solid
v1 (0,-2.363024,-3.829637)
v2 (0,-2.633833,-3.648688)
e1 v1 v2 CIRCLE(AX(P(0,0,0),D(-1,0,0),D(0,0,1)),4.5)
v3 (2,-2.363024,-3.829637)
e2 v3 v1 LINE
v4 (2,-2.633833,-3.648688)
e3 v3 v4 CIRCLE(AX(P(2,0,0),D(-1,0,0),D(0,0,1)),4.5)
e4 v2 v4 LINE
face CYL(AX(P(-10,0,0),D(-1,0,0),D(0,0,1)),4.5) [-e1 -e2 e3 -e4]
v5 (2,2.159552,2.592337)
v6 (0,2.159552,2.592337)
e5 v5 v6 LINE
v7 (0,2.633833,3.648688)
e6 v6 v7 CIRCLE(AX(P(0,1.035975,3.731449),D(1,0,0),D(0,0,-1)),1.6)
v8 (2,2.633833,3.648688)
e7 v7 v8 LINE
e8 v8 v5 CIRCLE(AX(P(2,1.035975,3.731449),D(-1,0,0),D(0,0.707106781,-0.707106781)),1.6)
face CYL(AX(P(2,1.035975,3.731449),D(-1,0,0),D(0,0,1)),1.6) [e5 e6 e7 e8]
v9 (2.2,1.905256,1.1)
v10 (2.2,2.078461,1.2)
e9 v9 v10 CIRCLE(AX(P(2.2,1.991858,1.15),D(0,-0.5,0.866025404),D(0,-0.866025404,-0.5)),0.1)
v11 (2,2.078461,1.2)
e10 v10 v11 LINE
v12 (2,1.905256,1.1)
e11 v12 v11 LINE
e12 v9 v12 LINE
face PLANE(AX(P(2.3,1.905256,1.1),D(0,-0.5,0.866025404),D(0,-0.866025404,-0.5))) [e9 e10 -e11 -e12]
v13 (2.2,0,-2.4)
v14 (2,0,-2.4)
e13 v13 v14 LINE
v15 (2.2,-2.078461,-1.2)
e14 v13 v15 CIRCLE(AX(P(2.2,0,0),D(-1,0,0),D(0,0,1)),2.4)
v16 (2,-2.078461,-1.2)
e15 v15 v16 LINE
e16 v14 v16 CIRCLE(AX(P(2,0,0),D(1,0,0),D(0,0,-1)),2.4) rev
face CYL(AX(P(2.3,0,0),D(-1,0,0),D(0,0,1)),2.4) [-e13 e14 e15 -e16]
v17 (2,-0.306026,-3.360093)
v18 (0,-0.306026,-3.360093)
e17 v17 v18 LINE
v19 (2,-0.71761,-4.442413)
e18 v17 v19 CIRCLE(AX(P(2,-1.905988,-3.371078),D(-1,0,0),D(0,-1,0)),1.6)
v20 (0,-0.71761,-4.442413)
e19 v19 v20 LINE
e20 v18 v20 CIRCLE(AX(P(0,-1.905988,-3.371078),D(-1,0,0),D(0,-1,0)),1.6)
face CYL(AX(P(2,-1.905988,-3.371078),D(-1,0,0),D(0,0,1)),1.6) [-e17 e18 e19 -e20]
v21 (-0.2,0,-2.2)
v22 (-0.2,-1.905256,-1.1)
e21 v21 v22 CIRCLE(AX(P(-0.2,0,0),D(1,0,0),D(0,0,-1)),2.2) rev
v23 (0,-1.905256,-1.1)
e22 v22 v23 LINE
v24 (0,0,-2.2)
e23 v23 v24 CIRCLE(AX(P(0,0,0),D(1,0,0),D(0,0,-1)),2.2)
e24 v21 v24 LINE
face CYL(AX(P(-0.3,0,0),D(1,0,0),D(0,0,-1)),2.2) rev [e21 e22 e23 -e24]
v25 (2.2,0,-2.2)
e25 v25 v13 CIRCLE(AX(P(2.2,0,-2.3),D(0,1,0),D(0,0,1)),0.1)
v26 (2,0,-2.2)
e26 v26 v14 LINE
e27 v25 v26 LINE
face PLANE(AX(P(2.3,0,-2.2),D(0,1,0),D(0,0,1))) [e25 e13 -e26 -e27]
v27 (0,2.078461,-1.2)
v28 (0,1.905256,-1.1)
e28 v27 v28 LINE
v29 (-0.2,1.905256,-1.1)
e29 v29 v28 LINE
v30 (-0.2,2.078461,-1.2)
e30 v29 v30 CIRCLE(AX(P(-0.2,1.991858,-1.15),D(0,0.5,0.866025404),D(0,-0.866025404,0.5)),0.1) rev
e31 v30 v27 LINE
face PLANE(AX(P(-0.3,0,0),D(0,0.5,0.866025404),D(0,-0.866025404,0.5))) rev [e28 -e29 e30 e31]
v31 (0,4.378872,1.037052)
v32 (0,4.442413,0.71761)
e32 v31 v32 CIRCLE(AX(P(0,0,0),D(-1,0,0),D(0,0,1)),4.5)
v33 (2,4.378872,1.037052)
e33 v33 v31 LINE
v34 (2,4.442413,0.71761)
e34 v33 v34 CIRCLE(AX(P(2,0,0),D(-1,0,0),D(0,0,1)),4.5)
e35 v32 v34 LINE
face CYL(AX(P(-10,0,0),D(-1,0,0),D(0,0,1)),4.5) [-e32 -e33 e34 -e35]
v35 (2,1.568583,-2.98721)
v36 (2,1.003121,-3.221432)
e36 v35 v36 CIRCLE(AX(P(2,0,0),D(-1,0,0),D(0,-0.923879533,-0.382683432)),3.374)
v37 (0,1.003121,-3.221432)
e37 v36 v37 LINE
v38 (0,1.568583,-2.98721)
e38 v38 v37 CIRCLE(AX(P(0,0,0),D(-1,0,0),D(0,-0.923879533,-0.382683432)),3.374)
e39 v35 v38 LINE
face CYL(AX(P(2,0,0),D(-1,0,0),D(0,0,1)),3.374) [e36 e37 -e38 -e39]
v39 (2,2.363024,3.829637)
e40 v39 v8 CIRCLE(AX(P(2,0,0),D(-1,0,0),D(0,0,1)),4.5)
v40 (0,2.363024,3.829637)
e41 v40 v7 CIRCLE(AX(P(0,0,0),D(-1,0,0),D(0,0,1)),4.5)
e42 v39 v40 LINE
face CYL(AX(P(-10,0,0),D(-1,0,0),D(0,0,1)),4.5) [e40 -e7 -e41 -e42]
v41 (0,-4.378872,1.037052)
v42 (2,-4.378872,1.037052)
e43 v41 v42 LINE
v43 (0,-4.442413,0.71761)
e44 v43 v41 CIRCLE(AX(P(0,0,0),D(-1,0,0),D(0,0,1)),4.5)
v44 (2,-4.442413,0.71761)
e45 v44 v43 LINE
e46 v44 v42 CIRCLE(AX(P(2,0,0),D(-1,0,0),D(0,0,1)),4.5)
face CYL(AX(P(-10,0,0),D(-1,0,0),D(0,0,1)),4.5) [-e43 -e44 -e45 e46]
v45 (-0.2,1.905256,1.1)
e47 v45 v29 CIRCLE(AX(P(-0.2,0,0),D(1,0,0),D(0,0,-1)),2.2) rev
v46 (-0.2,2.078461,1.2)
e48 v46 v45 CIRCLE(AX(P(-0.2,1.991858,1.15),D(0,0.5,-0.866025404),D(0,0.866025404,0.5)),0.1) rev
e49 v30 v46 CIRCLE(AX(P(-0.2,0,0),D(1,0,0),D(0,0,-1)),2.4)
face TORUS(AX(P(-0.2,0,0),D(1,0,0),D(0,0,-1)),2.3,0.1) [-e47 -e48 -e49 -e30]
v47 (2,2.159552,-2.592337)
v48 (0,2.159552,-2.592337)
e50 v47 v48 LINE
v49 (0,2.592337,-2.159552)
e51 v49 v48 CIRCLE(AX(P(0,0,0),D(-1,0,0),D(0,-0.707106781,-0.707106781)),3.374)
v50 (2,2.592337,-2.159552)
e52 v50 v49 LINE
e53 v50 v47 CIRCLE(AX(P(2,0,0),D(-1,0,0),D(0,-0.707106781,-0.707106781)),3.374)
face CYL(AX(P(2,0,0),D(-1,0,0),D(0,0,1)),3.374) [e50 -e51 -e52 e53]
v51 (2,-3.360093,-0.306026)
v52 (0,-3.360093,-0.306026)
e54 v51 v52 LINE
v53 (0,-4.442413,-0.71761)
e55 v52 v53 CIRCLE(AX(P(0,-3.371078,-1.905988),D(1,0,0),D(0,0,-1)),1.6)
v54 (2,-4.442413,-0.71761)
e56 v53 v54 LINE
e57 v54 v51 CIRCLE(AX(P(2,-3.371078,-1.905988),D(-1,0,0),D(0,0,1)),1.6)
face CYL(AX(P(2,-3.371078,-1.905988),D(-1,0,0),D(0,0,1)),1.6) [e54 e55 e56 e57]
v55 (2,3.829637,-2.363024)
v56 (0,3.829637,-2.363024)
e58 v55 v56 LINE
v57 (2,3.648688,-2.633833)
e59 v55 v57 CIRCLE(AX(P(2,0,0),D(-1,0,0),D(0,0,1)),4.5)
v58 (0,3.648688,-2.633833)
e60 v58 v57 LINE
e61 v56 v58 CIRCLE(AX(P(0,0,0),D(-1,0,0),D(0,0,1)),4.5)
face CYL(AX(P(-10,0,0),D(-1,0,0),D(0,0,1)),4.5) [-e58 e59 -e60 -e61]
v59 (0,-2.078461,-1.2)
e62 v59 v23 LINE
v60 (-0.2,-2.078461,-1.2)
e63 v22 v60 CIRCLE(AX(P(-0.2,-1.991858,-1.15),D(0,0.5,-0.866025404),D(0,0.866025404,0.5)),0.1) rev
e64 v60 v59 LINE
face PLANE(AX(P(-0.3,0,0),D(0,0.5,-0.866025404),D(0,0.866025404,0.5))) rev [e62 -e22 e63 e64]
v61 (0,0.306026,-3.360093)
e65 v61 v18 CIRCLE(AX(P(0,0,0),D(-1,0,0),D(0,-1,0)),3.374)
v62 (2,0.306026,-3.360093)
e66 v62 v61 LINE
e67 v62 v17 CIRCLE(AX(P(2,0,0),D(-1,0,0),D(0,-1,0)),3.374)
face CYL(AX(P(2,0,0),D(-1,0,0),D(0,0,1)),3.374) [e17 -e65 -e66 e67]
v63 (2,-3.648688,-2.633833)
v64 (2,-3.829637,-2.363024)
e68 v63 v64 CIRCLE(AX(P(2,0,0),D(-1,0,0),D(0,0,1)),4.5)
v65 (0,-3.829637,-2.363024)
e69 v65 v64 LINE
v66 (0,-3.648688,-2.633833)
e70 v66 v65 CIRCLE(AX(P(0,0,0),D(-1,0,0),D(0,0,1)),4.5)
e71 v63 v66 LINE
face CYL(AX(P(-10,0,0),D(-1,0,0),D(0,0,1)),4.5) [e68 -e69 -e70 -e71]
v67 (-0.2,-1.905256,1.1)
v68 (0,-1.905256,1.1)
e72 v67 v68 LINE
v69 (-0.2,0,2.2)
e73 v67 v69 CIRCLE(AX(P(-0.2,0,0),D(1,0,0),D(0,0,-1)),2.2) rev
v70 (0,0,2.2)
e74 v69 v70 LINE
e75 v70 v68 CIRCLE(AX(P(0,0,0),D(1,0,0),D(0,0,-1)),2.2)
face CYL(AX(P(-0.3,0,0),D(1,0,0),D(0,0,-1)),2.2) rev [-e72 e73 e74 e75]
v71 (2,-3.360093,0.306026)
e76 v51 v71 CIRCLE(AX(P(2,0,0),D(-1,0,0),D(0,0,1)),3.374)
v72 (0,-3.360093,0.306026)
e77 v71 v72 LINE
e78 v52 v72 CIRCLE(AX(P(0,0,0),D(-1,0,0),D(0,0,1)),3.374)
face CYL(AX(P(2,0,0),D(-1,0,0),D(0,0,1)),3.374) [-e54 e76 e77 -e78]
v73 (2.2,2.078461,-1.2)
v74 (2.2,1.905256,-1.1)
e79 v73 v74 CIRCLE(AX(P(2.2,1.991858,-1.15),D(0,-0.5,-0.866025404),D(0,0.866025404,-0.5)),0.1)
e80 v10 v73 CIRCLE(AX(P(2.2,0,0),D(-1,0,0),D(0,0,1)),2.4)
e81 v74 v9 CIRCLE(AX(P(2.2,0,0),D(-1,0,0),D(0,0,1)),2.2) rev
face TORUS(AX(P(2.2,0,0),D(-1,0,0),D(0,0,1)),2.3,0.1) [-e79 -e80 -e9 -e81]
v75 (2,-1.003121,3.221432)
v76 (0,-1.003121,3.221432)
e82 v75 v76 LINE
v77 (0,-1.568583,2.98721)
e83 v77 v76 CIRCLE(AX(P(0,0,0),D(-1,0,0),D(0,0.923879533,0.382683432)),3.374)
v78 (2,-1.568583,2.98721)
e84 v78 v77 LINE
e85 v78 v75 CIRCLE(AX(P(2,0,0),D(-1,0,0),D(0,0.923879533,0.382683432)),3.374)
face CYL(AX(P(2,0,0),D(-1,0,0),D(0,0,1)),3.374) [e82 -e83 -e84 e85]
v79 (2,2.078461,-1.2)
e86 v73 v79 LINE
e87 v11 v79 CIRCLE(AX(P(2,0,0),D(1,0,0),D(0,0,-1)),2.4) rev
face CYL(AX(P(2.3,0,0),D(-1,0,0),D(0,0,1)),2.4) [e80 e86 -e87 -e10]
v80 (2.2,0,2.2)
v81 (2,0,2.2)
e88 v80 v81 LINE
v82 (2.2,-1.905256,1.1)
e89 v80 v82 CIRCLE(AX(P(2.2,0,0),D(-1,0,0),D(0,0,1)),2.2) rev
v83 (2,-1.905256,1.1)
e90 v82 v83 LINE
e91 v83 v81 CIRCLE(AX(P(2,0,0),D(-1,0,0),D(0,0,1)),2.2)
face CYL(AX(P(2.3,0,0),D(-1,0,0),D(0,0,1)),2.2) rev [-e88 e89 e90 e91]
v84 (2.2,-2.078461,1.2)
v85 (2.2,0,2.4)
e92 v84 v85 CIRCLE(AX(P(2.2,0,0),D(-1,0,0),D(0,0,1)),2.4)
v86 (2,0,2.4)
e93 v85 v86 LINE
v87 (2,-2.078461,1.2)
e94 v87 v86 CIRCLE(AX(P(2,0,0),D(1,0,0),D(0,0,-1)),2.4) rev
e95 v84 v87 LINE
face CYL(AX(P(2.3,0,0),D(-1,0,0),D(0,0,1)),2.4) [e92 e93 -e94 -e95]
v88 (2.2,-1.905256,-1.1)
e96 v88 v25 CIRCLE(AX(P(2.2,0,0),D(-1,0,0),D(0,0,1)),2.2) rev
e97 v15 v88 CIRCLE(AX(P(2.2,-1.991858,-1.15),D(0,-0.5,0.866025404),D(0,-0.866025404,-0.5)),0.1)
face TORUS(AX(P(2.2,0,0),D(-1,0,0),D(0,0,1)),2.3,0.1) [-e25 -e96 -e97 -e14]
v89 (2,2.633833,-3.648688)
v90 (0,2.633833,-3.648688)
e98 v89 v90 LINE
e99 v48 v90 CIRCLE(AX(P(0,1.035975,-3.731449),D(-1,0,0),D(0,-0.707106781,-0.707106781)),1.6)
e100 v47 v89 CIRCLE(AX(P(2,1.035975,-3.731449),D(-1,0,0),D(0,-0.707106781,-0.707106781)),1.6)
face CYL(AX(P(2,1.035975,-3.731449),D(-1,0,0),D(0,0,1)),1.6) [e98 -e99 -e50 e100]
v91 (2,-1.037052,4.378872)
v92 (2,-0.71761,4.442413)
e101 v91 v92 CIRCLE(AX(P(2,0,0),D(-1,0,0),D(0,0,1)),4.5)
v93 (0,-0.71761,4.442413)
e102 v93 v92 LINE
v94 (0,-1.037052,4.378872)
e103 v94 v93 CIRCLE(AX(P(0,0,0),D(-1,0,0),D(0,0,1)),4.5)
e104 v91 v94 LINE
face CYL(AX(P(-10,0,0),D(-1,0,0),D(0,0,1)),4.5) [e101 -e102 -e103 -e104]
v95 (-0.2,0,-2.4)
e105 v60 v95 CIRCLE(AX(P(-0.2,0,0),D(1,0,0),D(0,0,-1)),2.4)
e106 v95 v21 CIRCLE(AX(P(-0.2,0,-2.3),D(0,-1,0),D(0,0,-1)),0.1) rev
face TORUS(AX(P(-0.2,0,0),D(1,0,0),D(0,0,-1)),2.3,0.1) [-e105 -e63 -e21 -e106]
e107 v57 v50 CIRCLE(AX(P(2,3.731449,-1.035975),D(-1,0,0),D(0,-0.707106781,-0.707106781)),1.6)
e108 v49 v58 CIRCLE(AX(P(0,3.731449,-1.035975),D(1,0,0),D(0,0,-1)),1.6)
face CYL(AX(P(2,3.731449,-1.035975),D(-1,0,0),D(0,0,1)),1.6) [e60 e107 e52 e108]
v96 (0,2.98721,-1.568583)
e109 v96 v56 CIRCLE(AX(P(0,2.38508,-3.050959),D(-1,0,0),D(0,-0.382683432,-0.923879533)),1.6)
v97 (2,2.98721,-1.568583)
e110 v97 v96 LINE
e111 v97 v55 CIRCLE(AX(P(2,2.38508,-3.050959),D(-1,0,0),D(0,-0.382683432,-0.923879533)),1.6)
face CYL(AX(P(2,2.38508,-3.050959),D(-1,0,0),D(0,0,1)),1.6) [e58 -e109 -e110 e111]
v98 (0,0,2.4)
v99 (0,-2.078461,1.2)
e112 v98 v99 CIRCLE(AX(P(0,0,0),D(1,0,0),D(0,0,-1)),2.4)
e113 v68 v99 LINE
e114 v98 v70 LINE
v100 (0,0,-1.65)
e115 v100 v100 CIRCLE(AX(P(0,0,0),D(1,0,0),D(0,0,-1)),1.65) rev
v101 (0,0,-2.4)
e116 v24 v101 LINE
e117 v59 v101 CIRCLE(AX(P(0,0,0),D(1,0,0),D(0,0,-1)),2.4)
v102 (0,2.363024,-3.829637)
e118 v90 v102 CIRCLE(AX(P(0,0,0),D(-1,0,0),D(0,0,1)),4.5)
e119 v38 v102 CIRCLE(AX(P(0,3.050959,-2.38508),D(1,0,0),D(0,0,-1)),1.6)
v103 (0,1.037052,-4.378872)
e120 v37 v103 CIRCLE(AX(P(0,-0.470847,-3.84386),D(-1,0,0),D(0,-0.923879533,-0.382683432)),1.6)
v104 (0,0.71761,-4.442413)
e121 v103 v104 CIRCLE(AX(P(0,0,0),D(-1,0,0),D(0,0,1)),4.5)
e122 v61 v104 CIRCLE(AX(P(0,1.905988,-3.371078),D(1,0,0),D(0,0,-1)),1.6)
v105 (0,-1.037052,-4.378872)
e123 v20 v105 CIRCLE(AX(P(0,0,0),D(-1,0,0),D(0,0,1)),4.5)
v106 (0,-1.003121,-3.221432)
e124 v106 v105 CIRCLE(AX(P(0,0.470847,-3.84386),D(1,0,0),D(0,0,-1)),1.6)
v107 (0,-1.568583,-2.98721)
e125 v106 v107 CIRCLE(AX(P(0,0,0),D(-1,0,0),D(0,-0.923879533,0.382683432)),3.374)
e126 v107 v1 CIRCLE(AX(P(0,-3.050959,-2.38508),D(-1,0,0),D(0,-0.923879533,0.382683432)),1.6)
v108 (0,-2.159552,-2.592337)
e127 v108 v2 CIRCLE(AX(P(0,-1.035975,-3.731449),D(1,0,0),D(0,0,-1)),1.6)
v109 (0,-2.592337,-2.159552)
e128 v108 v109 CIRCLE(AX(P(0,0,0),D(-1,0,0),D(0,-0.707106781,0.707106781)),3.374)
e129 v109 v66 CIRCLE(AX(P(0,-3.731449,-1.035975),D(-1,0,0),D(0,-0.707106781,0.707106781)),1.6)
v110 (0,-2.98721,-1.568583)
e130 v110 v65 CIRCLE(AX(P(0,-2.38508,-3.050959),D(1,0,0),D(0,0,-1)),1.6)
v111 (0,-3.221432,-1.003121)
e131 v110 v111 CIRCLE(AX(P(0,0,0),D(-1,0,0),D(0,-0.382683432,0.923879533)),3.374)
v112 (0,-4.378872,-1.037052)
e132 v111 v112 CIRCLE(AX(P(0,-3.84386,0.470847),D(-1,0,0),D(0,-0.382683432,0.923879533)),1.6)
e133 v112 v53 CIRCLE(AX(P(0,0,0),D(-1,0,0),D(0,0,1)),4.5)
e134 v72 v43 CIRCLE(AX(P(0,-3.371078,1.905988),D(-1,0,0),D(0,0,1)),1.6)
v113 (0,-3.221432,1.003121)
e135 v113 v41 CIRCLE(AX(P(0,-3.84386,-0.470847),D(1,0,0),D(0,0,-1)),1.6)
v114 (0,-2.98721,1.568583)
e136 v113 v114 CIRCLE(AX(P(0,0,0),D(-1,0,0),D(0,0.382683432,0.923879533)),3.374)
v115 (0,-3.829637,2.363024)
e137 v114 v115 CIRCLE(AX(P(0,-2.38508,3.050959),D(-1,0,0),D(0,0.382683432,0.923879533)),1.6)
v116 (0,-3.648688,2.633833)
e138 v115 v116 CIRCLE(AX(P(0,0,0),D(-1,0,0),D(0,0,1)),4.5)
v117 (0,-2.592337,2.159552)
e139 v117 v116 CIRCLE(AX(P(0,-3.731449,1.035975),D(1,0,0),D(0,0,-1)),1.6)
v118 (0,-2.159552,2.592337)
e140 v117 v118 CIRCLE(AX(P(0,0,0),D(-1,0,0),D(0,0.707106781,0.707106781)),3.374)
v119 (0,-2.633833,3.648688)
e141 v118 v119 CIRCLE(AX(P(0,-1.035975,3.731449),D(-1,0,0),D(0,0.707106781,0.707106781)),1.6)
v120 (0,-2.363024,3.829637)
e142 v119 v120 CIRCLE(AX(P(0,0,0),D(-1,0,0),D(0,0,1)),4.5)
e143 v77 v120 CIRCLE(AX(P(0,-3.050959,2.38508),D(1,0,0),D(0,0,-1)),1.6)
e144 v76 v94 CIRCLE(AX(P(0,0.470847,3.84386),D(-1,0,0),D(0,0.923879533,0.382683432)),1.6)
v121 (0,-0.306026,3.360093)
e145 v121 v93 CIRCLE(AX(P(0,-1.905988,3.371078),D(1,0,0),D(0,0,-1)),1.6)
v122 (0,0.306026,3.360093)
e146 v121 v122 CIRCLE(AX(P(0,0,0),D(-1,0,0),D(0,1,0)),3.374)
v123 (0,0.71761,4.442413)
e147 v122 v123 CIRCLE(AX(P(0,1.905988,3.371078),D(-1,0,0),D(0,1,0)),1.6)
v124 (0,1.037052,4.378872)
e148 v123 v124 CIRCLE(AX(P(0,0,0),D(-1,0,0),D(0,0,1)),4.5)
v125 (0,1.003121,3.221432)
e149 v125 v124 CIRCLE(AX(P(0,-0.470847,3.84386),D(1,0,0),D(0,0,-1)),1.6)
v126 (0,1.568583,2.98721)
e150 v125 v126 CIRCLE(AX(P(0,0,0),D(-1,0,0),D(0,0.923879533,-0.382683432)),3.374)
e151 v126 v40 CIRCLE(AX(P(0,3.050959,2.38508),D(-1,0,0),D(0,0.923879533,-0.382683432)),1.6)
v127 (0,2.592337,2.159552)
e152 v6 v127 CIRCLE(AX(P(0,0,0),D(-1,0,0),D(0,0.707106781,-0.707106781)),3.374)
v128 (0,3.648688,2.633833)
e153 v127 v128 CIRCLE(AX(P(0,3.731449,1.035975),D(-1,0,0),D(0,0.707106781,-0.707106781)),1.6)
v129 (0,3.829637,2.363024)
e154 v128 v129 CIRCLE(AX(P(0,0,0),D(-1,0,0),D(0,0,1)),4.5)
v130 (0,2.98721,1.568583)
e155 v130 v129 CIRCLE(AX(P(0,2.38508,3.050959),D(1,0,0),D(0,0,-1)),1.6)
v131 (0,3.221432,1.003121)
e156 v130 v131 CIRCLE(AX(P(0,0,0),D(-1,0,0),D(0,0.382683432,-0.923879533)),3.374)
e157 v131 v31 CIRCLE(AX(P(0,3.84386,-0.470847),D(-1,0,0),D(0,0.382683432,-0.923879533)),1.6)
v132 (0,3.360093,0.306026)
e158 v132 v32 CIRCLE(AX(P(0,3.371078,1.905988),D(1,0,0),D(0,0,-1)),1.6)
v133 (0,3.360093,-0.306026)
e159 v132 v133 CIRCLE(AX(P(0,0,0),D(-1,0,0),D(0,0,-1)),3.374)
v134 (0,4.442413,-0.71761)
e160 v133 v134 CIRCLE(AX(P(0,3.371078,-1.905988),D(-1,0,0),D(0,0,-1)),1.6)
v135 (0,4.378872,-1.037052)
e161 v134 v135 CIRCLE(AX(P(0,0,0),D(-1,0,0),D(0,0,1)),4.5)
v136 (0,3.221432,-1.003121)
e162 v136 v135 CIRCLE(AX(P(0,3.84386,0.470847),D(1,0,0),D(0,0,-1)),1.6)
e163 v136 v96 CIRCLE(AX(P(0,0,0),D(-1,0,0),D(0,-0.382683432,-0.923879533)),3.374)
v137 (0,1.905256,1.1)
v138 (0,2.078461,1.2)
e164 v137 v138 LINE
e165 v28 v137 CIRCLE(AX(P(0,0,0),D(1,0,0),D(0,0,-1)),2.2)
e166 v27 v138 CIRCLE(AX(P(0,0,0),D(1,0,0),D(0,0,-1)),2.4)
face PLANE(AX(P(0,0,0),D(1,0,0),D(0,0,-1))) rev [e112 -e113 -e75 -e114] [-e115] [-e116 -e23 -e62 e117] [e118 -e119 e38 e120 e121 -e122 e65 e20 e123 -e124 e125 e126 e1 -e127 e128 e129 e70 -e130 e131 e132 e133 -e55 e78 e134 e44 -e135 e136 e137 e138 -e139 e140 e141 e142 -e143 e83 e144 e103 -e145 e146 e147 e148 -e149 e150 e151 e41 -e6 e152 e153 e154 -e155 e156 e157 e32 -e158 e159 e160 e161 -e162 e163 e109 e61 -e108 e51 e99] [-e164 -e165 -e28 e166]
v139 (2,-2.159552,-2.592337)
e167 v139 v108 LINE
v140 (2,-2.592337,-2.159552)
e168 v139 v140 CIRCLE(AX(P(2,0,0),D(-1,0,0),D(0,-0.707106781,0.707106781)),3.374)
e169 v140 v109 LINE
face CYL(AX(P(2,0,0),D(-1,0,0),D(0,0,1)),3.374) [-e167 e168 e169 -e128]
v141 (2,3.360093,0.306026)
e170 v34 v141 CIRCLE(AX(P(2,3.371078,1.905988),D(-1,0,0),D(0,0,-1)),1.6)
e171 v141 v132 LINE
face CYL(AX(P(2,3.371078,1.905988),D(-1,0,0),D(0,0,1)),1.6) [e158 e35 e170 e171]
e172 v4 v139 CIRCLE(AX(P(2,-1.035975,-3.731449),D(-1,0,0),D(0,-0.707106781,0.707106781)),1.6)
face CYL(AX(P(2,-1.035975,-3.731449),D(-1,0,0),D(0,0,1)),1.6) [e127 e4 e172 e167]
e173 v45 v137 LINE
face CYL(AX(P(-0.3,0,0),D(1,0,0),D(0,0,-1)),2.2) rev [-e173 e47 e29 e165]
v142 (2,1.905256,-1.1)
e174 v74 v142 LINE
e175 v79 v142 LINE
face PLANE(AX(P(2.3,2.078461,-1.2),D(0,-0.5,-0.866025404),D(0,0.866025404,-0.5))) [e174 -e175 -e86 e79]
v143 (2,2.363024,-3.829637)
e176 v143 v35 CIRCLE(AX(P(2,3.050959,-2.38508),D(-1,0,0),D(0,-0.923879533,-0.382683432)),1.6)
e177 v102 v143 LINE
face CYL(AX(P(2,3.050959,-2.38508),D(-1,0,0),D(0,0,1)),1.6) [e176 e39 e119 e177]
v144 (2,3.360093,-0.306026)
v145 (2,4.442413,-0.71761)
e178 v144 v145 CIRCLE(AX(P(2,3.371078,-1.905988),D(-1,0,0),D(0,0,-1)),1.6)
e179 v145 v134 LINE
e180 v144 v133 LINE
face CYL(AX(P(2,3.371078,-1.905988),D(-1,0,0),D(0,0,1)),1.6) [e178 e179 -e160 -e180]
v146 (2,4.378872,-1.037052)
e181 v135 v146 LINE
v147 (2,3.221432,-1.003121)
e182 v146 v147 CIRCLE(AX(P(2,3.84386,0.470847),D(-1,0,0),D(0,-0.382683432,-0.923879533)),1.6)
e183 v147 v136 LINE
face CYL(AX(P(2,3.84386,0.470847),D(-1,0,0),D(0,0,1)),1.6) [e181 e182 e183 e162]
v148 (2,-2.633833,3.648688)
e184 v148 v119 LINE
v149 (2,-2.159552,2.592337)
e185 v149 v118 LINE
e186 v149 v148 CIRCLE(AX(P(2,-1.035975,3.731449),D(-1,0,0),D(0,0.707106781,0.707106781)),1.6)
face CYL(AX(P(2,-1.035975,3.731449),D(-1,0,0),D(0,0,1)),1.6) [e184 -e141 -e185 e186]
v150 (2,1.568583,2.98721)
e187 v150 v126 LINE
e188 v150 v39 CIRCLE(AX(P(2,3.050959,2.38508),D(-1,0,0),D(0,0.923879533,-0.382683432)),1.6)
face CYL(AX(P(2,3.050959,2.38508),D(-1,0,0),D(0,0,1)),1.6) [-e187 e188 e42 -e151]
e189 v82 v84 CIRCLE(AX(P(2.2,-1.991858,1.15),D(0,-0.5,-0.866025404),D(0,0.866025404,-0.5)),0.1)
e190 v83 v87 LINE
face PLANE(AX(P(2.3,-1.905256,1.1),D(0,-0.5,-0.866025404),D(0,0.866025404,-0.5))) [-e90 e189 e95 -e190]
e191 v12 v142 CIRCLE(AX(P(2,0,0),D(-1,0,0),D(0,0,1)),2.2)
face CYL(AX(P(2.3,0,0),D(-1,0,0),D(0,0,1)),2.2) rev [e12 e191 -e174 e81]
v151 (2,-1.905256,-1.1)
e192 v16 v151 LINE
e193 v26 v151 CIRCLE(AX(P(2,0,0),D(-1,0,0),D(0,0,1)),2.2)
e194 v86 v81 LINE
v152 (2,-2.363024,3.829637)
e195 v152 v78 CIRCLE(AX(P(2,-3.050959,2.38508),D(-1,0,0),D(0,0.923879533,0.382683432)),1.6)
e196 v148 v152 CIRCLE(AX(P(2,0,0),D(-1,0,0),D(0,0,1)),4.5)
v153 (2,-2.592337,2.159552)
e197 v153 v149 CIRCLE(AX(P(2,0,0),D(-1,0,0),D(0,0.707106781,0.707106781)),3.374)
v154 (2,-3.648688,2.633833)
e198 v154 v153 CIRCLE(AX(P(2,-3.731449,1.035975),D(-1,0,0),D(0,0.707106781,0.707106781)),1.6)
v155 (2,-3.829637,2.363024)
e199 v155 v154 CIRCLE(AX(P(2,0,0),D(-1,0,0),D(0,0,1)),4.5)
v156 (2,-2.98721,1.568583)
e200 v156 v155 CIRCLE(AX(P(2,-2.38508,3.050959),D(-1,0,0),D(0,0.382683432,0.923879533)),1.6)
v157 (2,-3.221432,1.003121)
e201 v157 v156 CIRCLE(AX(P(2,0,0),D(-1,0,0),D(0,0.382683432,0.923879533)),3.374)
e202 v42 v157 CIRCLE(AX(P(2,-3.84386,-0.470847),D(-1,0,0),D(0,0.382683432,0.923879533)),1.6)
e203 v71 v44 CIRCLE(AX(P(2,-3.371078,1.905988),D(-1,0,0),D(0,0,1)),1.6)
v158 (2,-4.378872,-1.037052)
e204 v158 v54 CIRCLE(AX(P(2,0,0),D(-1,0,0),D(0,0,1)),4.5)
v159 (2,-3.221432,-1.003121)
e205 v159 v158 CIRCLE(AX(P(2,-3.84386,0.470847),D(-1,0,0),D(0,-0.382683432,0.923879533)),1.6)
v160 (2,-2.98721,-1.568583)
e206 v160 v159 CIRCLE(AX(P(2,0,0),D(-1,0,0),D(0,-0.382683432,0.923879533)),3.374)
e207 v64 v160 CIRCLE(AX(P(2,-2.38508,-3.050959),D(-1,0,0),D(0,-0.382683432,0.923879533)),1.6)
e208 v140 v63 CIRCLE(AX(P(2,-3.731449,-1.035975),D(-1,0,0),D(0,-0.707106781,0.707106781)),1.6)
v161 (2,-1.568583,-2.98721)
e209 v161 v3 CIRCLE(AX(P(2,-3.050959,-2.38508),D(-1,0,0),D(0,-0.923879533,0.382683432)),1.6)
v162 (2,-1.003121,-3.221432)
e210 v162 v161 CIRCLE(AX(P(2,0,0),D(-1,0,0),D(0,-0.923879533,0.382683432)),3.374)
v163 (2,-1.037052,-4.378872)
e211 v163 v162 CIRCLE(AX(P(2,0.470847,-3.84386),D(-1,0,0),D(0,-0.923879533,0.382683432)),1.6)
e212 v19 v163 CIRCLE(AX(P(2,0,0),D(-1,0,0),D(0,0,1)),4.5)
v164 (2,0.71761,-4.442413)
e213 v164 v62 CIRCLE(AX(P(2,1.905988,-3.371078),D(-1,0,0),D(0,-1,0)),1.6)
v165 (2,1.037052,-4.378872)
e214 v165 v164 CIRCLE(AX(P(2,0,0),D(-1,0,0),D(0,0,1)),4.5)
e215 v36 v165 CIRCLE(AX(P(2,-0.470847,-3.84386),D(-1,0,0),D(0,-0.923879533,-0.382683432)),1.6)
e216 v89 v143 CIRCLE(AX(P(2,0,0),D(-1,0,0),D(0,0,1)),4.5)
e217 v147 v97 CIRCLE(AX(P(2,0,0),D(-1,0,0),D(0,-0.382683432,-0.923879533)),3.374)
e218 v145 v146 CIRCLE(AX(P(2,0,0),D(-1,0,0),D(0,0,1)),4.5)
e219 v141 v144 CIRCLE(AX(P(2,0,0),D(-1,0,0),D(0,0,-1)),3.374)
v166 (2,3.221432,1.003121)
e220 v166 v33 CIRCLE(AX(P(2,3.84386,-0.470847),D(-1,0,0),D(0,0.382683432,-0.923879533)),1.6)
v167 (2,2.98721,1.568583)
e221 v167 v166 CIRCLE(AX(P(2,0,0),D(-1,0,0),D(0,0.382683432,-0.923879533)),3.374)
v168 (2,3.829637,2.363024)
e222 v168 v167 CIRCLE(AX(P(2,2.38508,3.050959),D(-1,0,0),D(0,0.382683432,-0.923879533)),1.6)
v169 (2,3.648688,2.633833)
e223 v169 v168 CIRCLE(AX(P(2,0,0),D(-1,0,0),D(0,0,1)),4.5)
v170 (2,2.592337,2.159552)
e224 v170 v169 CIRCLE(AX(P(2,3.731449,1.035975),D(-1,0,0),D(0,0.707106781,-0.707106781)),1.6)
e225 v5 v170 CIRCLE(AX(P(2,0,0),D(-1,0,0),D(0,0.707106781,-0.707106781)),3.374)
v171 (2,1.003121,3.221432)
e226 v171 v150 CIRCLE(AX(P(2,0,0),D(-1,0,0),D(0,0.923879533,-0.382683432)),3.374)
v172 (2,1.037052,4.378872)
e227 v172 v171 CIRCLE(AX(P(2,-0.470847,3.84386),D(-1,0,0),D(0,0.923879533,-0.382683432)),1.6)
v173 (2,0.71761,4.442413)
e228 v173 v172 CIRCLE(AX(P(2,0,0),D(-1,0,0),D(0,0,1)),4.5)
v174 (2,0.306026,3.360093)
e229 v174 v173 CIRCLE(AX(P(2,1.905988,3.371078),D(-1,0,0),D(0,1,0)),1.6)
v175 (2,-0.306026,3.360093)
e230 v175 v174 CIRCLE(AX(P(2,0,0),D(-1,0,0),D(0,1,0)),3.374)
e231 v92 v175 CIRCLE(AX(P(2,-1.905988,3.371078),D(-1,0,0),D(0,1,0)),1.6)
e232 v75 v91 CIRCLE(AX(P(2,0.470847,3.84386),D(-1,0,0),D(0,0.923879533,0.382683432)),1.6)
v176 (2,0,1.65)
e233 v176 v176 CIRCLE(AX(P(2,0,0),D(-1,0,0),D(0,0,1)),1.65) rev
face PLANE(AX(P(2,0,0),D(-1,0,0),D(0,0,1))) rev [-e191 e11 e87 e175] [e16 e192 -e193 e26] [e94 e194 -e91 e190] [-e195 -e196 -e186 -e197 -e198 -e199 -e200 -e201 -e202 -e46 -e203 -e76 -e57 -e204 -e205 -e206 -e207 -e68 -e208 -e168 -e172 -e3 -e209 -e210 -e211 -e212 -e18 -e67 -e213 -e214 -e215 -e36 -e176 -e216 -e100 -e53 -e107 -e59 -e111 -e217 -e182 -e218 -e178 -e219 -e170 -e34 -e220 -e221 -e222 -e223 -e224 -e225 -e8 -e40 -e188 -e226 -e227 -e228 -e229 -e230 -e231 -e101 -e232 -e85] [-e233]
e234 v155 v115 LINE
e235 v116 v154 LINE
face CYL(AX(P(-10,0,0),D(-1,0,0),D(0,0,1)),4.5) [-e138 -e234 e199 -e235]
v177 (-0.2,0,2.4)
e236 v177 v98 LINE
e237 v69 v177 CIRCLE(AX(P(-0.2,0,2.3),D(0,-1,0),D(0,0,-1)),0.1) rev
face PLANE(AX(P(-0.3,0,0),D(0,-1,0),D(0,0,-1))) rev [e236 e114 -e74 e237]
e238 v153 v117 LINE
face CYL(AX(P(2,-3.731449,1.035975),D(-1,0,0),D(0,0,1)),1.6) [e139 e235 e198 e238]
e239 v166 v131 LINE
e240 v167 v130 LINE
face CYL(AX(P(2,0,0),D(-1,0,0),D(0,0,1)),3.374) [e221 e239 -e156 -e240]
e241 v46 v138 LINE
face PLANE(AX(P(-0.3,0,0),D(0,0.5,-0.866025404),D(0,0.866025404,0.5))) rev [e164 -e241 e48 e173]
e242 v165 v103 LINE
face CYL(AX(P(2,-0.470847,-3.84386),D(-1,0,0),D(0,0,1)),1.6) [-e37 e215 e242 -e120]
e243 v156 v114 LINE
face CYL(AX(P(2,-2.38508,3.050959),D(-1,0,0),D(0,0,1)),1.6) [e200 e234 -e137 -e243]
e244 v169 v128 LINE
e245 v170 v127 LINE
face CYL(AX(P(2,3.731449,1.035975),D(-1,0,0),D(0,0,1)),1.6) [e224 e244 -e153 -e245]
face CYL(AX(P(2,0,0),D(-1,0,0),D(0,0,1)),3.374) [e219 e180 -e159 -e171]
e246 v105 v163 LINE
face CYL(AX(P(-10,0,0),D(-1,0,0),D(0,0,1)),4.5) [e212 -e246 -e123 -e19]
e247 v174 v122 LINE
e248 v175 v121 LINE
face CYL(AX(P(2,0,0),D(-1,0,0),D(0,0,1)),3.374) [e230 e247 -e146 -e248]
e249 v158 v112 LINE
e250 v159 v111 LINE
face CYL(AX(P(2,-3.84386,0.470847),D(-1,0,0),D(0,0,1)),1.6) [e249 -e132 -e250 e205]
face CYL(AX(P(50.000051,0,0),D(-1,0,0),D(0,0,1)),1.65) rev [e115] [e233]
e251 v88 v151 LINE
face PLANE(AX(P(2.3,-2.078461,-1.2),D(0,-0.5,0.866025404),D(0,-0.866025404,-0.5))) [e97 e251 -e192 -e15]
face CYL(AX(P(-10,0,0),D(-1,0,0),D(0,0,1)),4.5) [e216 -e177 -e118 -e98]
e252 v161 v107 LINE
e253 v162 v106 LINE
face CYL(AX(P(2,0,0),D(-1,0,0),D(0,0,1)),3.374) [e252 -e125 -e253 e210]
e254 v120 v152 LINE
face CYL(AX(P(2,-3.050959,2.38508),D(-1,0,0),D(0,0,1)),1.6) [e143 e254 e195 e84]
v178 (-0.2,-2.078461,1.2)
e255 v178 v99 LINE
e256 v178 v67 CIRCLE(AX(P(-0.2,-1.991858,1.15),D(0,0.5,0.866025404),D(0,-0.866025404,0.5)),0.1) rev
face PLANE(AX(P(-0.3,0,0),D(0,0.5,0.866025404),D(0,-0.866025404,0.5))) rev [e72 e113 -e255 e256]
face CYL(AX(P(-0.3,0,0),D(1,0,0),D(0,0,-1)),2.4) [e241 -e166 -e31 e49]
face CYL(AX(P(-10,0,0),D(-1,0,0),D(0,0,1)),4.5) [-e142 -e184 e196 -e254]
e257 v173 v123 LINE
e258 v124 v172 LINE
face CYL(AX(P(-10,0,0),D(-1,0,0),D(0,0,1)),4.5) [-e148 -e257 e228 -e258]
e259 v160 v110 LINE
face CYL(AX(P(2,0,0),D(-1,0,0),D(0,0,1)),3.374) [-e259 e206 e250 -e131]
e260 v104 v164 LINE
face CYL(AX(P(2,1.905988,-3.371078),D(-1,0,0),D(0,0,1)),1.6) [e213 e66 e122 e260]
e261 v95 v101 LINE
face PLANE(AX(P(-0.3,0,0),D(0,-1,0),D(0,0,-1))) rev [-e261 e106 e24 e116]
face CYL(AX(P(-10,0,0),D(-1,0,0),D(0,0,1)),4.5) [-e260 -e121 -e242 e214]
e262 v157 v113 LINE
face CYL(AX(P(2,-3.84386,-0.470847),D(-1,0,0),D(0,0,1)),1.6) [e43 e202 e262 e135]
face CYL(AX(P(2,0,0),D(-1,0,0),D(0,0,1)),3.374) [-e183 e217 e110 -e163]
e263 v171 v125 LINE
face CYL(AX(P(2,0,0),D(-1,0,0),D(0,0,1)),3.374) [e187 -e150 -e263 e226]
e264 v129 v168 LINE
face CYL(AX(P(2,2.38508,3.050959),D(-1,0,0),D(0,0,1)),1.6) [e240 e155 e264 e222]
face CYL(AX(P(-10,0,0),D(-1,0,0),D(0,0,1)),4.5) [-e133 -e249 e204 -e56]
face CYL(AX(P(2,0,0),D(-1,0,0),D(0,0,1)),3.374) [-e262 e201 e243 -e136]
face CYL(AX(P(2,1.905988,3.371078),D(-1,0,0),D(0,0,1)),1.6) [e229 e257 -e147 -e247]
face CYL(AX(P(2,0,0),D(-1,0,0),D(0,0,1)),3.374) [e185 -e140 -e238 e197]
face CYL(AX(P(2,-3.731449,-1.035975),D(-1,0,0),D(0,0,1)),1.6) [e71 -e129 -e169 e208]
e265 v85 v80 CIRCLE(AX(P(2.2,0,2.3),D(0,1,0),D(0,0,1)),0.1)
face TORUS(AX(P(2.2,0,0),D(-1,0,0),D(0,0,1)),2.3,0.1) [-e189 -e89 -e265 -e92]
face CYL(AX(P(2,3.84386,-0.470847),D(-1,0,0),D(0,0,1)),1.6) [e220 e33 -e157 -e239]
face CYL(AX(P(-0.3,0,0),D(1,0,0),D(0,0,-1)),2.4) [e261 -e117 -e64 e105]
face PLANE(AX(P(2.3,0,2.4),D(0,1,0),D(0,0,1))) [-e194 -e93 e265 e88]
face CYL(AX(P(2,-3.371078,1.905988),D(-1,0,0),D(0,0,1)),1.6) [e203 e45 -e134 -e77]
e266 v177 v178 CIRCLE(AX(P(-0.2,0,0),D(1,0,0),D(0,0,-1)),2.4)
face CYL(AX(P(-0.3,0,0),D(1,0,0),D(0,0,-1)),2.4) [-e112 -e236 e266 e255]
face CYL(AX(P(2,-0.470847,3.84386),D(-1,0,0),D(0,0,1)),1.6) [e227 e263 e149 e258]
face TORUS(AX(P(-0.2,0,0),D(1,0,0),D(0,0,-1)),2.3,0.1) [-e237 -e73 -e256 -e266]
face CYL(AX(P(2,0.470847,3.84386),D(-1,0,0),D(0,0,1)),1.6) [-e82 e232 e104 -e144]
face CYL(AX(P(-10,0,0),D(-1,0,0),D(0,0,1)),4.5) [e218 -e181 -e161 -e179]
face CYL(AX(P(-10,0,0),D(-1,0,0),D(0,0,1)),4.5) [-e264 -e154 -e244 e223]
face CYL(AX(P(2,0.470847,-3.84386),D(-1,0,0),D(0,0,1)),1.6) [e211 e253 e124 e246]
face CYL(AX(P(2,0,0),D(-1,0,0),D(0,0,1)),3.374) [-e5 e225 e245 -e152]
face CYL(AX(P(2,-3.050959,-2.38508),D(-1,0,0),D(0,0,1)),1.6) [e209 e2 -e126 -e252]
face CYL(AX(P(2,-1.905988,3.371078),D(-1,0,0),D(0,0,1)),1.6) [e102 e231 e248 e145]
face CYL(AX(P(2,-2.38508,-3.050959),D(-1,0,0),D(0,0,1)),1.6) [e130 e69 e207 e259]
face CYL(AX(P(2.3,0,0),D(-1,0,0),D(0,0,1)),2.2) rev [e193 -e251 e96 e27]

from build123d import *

# Parameters (mm, degrees)
BASPROSKE_W     = 2
BASPROSKE_H     = 4.5
TOOTHCUT_DEPTH  = 7.670832032
TEETHCUTS_COUNT = 16
TEETHCUTS_ANGLE = 337.5
BORSKE_R        = 1.65
BORE_DEPTH      = 50.0000508
EXTRUDE_2_DEPTH = 0.3
FILLET_4_R      = 0.1
FILLET_5_R      = 0.1
FILLET_6_R      = 0.1
EXTRUDE_START   = -2.3
EXTRUDE_5_DEPTH = 0.3
FILLET_7_R      = 0.1
FILLET_8_R      = 0.1
FILLET_9_R      = 0.1


with BuildPart() as part:
    # BasProSke → Base-Revolve (revolve)
    with BuildSketch(Plane(origin=(0, 0, 0), x_dir=(1, 0, 0), z_dir=(0, 1, 0)), mode=Mode.PRIVATE) as base_revolve_sk:
        with Locations((1, 2.25)):
            Rectangle(BASPROSKE_W, BASPROSKE_H)
    revolve(base_revolve_sk.sketch.rotate(Axis((-10, 0, 0), (1, 0, 0)), 180), axis=Axis((-10, 0, 0), (1, 0, 0)))

    # TooCutSke → ToothCut (cut, through all)
    with BuildSketch(Plane(origin=(0, 0, 0), x_dir=(0, 0, -1), z_dir=(1, 0, 0))):
        with BuildLine():
            ThreePointArc((0.306025637, 3.360092902), (0, 3.374), (-0.306025637, 3.360092902))
            ThreePointArc((-0.306025637, 3.360092902), (-0.415941512, 3.953968919), (-0.738171669, 4.464789776))
            ThreePointArc((-0.738171669, 4.464789776), (0, 4.5254), (0.738171669, 4.464789776))
            ThreePointArc((0.738171669, 4.464789776), (0.415941512, 3.953968919), (0.306025637, 3.360092902))
        make_face()
    toothcut = extrude(amount=TOOTHCUT_DEPTH, mode=Mode.SUBTRACT)

    # TeethCuts: ToothCut ×16 about axis
    teethcuts_axis = Axis((-10, 0, 0), (1, 0, 0))
    for i in range(1, TEETHCUTS_COUNT):
        add(toothcut.rotate(teethcuts_axis, i * TEETHCUTS_ANGLE / (TEETHCUTS_COUNT - 1)), mode=Mode.SUBTRACT)

    # BorSke → Bore (cut, symmetric)
    with BuildSketch(Plane(origin=(0, 0, 0), x_dir=(0, 0, -1), z_dir=(1, 0, 0))):
        with Locations(Location((0, 0, 0), (0, 0, 180))):
            Circle(BORSKE_R)
    extrude(amount=BORE_DEPTH, both=True, mode=Mode.SUBTRACT)

    # 草图1 → 拉伸-薄壁2 (add)
    with BuildSketch(Plane(origin=(2, 0, 0), x_dir=(0, 0, -1), z_dir=(1, 0, 0))):
        with BuildLine():
            ThreePointArc((-1.1, 1.905255888), (0, 2.2), (1.1, 1.905255888))
            Line((1.1, 1.905255888), (1.2, 2.078460969))
            ThreePointArc((1.2, 2.078460969), (0, 2.4), (-1.2, 2.078460969))
            Line((-1.2, 2.078460969), (-1.1, 1.905255888))
        make_face()
        with BuildLine():
            ThreePointArc((2.2, 0), (1.905255888, -1.1), (1.1, -1.905255888))
            Line((1.1, -1.905255888), (1.2, -2.078460969))
            ThreePointArc((1.2, -2.078460969), (2.078460969, -1.2), (2.4, 0))
            Line((2.4, 0), (2.2, 0))
        make_face()
        with BuildLine():
            ThreePointArc((-1.1, -1.905255888), (-1.905255888, -1.1), (-2.2, 0))
            Line((-2.2, 0), (-2.4, 0))
            ThreePointArc((-2.4, 0), (-2.078460969, -1.2), (-1.2, -2.078460969))
            Line((-1.2, -2.078460969), (-1.1, -1.905255888))
        make_face()
    extrude(amount=EXTRUDE_2_DEPTH)

    # 圆角4
    # the kernel refuses this fillet: 0.1 mm, written as the material it takes off along each edge
    with BuildSketch(Plane(origin=(2.3, 0, 0), x_dir=(0, 0.10399688261682524, 0.994577623117463), z_dir=(0, 0.994577623117463, -0.10399688261682524))) as fillet_4_piece_1:
        with BuildLine():
            CenterArc((2.4 - FILLET_4_R, -FILLET_4_R), FILLET_4_R, 0, 90)
            Line((2.4 - FILLET_4_R, 0), (2.4, 0))
            Line((2.4, 0), (2.4, -FILLET_4_R))
        make_face()
    revolve(axis=Axis((2.3, 0, 0), (1, 0, 0)), revolution_arc=71.938751527, mode=Mode.SUBTRACT)
    with BuildSketch(Plane(origin=(2.3, 0, 0), x_dir=(0, -0.9171438900620574, 0.39855625063701683), z_dir=(0, -0.39855625063701683, -0.9171438900620574))) as fillet_4_piece_2:
        with BuildLine():
            CenterArc((2.2 + FILLET_4_R, FILLET_4_R), FILLET_4_R, 180, 90)
            Line((2.2 + FILLET_4_R, 0), (2.2, 0))
            Line((2.2, 0), (2.2, FILLET_4_R))
        make_face()
    revolve(axis=Axis((2.3, 0, 0), (-1, 0, 0)), revolution_arc=73.024092575, mode=Mode.SUBTRACT)

    # 圆角5
    # the kernel refuses this fillet: 0.1 mm, written as the material it takes off along each edge
    with BuildSketch(Plane(origin=(2.3, 0, 0), x_dir=(0, 0.809331046346937, -0.5873527538191783), z_dir=(0, -0.5873527538191783, -0.809331046346937))) as fillet_5_piece_1:
        with BuildLine():
            CenterArc((2.4 - FILLET_5_R, -FILLET_5_R), FILLET_5_R, 0, 90)
            Line((2.4 - FILLET_5_R, 0), (2.4, 0))
            Line((2.4, 0), (2.4, -FILLET_5_R))
        make_face()
    revolve(axis=Axis((2.3, 0, 0), (1, 0, 0)), revolution_arc=71.938751527, mode=Mode.SUBTRACT)
    with BuildSketch(Plane(origin=(2.3, 0, 0), x_dir=(0, 0.8037317829196821, 0.5949917824010252), z_dir=(0, -0.5949917824010252, 0.8037317829196821))) as fillet_5_piece_2:
        with BuildLine():
            CenterArc((2.2 + FILLET_5_R, FILLET_5_R), FILLET_5_R, 180, 90)
            Line((2.2 + FILLET_5_R, 0), (2.2, 0))
            Line((2.2, 0), (2.2, FILLET_5_R))
        make_face()
    revolve(axis=Axis((2.3, 0, 0), (-1, 0, 0)), revolution_arc=73.024092575, mode=Mode.SUBTRACT)

    # 圆角6
    # the kernel refuses this fillet: 0.1 mm, written as the material it takes off along each edge
    with BuildSketch(Plane(origin=(2.3, 0, 0), x_dir=(0, -0.9133279289636526, -0.4072248692982359), z_dir=(0, -0.4072248692982359, 0.9133279289636526))) as fillet_6_piece_1:
        with BuildLine():
            CenterArc((2.4 - FILLET_6_R, -FILLET_6_R), FILLET_6_R, 0, 90)
            Line((2.4 - FILLET_6_R, 0), (2.4, 0))
            Line((2.4, 0), (2.4, -FILLET_6_R))
        make_face()
    revolve(axis=Axis((2.3, 0, 0), (1, 0, 0)), revolution_arc=71.938751527, mode=Mode.SUBTRACT)
    with BuildSketch(Plane(origin=(2.3, 0, 0), x_dir=(0, 0.11341210714236213, -0.9935480330379249), z_dir=(0, 0.9935480330379249, 0.11341210714236213))) as fillet_6_piece_2:
        with BuildLine():
            CenterArc((2.2 + FILLET_6_R, FILLET_6_R), FILLET_6_R, 180, 90)
            Line((2.2 + FILLET_6_R, 0), (2.2, 0))
            Line((2.2, 0), (2.2, FILLET_6_R))
        make_face()
    revolve(axis=Axis((2.3, 0, 0), (-1, 0, 0)), revolution_arc=73.024092575, mode=Mode.SUBTRACT)

    # 草图1<5> → 拉伸-薄壁5 (add)
    with BuildSketch(Plane(origin=(2, 0, 0), x_dir=(0, 0, -1), z_dir=(1, 0, 0)).offset(EXTRUDE_START)):
        with BuildLine():
            ThreePointArc((-1.1, 1.905255888), (0, 2.2), (1.1, 1.905255888))
            Line((1.1, 1.905255888), (1.2, 2.078460969))
            ThreePointArc((1.2, 2.078460969), (0, 2.4), (-1.2, 2.078460969))
            Line((-1.2, 2.078460969), (-1.1, 1.905255888))
        make_face()
        with BuildLine():
            ThreePointArc((2.2, 0), (1.905255888, -1.1), (1.1, -1.905255888))
            Line((1.1, -1.905255888), (1.2, -2.078460969))
            ThreePointArc((1.2, -2.078460969), (2.078460969, -1.2), (2.4, 0))
            Line((2.4, 0), (2.2, 0))
        make_face()
        with BuildLine():
            ThreePointArc((-1.1, -1.905255888), (-1.905255888, -1.1), (-2.2, 0))
            Line((-2.2, 0), (-2.4, 0))
            ThreePointArc((-2.4, 0), (-2.078460969, -1.2), (-1.2, -2.078460969))
            Line((-1.2, -2.078460969), (-1.1, -1.905255888))
        make_face()
    extrude(amount=EXTRUDE_5_DEPTH)

    # 圆角7
    # the kernel refuses this fillet: 0.1 mm, written as the material it takes off along each edge
    with BuildSketch(Plane(origin=(-0.3, 0, 0), x_dir=(0, 0.809331046346937, -0.5873527538191783), z_dir=(0, -0.5873527538191783, -0.809331046346937))) as fillet_7_piece_1:
        with BuildLine():
            CenterArc((2.4 - FILLET_7_R, FILLET_7_R), FILLET_7_R, 270, 90)
            Line((2.4 - FILLET_7_R, 0), (2.4, 0))
            Line((2.4, 0), (2.4, FILLET_7_R))
        make_face()
    revolve(axis=Axis((-0.3, 0, 0), (1, 0, 0)), revolution_arc=71.938751527, mode=Mode.SUBTRACT)
    with BuildSketch(Plane(origin=(-0.3, 0, 0), x_dir=(0, 0.8037317829196821, 0.5949917824010252), z_dir=(0, -0.5949917824010252, 0.8037317829196821))) as fillet_7_piece_2:
        with BuildLine():
            CenterArc((2.2 + FILLET_7_R, -FILLET_7_R), FILLET_7_R, 90, 90)
            Line((2.2 + FILLET_7_R, 0), (2.2, 0))
            Line((2.2, 0), (2.2, -FILLET_7_R))
        make_face()
    revolve(axis=Axis((-0.3, 0, 0), (-1, 0, 0)), revolution_arc=73.024092575, mode=Mode.SUBTRACT)

    # 圆角8
    # the kernel refuses this fillet: 0.1 mm, written as the material it takes off along each edge
    with BuildSketch(Plane(origin=(-0.3, 0, 0), x_dir=(0, 0.10399688261682512, 0.994577623117463), z_dir=(0, 0.994577623117463, -0.10399688261682512))) as fillet_8_piece_1:
        with BuildLine():
            CenterArc((2.4 - FILLET_8_R, FILLET_8_R), FILLET_8_R, 270, 90)
            Line((2.4 - FILLET_8_R, 0), (2.4, 0))
            Line((2.4, 0), (2.4, FILLET_8_R))
        make_face()
    revolve(axis=Axis((-0.3, 0, 0), (1, 0, 0)), revolution_arc=71.938751527, mode=Mode.SUBTRACT)
    with BuildSketch(Plane(origin=(-0.3, 0, 0), x_dir=(0, -0.9171438900620574, 0.39855625063701694), z_dir=(0, -0.39855625063701694, -0.9171438900620574))) as fillet_8_piece_2:
        with BuildLine():
            CenterArc((2.2 + FILLET_8_R, -FILLET_8_R), FILLET_8_R, 90, 90)
            Line((2.2 + FILLET_8_R, 0), (2.2, 0))
            Line((2.2, 0), (2.2, -FILLET_8_R))
        make_face()
    revolve(axis=Axis((-0.3, 0, 0), (-1, 0, 0)), revolution_arc=73.024092575, mode=Mode.SUBTRACT)

    # 圆角9
    # the kernel refuses this fillet: 0.1 mm, written as the material it takes off along each edge
    with BuildSketch(Plane(origin=(-0.3, 0, 0), x_dir=(0, -0.9133279289636526, -0.4072248692982359), z_dir=(0, -0.4072248692982359, 0.9133279289636526))) as fillet_9_piece_1:
        with BuildLine():
            CenterArc((2.4 - FILLET_9_R, FILLET_9_R), FILLET_9_R, 270, 90)
            Line((2.4 - FILLET_9_R, 0), (2.4, 0))
            Line((2.4, 0), (2.4, FILLET_9_R))
        make_face()
    revolve(axis=Axis((-0.3, 0, 0), (1, 0, 0)), revolution_arc=71.938751527, mode=Mode.SUBTRACT)
    with BuildSketch(Plane(origin=(-0.3, 0, 0), x_dir=(0, 0.11341210714236213, -0.9935480330379249), z_dir=(0, 0.9935480330379249, 0.11341210714236213))) as fillet_9_piece_2:
        with BuildLine():
            CenterArc((2.2 + FILLET_9_R, -FILLET_9_R), FILLET_9_R, 90, 90)
            Line((2.2 + FILLET_9_R, 0), (2.2, 0))
            Line((2.2, 0), (2.2, -FILLET_9_R))
        make_face()
    revolve(axis=Axis((-0.3, 0, 0), (-1, 0, 0)), revolution_arc=73.024092575, mode=Mode.SUBTRACT)


solid = part.part
